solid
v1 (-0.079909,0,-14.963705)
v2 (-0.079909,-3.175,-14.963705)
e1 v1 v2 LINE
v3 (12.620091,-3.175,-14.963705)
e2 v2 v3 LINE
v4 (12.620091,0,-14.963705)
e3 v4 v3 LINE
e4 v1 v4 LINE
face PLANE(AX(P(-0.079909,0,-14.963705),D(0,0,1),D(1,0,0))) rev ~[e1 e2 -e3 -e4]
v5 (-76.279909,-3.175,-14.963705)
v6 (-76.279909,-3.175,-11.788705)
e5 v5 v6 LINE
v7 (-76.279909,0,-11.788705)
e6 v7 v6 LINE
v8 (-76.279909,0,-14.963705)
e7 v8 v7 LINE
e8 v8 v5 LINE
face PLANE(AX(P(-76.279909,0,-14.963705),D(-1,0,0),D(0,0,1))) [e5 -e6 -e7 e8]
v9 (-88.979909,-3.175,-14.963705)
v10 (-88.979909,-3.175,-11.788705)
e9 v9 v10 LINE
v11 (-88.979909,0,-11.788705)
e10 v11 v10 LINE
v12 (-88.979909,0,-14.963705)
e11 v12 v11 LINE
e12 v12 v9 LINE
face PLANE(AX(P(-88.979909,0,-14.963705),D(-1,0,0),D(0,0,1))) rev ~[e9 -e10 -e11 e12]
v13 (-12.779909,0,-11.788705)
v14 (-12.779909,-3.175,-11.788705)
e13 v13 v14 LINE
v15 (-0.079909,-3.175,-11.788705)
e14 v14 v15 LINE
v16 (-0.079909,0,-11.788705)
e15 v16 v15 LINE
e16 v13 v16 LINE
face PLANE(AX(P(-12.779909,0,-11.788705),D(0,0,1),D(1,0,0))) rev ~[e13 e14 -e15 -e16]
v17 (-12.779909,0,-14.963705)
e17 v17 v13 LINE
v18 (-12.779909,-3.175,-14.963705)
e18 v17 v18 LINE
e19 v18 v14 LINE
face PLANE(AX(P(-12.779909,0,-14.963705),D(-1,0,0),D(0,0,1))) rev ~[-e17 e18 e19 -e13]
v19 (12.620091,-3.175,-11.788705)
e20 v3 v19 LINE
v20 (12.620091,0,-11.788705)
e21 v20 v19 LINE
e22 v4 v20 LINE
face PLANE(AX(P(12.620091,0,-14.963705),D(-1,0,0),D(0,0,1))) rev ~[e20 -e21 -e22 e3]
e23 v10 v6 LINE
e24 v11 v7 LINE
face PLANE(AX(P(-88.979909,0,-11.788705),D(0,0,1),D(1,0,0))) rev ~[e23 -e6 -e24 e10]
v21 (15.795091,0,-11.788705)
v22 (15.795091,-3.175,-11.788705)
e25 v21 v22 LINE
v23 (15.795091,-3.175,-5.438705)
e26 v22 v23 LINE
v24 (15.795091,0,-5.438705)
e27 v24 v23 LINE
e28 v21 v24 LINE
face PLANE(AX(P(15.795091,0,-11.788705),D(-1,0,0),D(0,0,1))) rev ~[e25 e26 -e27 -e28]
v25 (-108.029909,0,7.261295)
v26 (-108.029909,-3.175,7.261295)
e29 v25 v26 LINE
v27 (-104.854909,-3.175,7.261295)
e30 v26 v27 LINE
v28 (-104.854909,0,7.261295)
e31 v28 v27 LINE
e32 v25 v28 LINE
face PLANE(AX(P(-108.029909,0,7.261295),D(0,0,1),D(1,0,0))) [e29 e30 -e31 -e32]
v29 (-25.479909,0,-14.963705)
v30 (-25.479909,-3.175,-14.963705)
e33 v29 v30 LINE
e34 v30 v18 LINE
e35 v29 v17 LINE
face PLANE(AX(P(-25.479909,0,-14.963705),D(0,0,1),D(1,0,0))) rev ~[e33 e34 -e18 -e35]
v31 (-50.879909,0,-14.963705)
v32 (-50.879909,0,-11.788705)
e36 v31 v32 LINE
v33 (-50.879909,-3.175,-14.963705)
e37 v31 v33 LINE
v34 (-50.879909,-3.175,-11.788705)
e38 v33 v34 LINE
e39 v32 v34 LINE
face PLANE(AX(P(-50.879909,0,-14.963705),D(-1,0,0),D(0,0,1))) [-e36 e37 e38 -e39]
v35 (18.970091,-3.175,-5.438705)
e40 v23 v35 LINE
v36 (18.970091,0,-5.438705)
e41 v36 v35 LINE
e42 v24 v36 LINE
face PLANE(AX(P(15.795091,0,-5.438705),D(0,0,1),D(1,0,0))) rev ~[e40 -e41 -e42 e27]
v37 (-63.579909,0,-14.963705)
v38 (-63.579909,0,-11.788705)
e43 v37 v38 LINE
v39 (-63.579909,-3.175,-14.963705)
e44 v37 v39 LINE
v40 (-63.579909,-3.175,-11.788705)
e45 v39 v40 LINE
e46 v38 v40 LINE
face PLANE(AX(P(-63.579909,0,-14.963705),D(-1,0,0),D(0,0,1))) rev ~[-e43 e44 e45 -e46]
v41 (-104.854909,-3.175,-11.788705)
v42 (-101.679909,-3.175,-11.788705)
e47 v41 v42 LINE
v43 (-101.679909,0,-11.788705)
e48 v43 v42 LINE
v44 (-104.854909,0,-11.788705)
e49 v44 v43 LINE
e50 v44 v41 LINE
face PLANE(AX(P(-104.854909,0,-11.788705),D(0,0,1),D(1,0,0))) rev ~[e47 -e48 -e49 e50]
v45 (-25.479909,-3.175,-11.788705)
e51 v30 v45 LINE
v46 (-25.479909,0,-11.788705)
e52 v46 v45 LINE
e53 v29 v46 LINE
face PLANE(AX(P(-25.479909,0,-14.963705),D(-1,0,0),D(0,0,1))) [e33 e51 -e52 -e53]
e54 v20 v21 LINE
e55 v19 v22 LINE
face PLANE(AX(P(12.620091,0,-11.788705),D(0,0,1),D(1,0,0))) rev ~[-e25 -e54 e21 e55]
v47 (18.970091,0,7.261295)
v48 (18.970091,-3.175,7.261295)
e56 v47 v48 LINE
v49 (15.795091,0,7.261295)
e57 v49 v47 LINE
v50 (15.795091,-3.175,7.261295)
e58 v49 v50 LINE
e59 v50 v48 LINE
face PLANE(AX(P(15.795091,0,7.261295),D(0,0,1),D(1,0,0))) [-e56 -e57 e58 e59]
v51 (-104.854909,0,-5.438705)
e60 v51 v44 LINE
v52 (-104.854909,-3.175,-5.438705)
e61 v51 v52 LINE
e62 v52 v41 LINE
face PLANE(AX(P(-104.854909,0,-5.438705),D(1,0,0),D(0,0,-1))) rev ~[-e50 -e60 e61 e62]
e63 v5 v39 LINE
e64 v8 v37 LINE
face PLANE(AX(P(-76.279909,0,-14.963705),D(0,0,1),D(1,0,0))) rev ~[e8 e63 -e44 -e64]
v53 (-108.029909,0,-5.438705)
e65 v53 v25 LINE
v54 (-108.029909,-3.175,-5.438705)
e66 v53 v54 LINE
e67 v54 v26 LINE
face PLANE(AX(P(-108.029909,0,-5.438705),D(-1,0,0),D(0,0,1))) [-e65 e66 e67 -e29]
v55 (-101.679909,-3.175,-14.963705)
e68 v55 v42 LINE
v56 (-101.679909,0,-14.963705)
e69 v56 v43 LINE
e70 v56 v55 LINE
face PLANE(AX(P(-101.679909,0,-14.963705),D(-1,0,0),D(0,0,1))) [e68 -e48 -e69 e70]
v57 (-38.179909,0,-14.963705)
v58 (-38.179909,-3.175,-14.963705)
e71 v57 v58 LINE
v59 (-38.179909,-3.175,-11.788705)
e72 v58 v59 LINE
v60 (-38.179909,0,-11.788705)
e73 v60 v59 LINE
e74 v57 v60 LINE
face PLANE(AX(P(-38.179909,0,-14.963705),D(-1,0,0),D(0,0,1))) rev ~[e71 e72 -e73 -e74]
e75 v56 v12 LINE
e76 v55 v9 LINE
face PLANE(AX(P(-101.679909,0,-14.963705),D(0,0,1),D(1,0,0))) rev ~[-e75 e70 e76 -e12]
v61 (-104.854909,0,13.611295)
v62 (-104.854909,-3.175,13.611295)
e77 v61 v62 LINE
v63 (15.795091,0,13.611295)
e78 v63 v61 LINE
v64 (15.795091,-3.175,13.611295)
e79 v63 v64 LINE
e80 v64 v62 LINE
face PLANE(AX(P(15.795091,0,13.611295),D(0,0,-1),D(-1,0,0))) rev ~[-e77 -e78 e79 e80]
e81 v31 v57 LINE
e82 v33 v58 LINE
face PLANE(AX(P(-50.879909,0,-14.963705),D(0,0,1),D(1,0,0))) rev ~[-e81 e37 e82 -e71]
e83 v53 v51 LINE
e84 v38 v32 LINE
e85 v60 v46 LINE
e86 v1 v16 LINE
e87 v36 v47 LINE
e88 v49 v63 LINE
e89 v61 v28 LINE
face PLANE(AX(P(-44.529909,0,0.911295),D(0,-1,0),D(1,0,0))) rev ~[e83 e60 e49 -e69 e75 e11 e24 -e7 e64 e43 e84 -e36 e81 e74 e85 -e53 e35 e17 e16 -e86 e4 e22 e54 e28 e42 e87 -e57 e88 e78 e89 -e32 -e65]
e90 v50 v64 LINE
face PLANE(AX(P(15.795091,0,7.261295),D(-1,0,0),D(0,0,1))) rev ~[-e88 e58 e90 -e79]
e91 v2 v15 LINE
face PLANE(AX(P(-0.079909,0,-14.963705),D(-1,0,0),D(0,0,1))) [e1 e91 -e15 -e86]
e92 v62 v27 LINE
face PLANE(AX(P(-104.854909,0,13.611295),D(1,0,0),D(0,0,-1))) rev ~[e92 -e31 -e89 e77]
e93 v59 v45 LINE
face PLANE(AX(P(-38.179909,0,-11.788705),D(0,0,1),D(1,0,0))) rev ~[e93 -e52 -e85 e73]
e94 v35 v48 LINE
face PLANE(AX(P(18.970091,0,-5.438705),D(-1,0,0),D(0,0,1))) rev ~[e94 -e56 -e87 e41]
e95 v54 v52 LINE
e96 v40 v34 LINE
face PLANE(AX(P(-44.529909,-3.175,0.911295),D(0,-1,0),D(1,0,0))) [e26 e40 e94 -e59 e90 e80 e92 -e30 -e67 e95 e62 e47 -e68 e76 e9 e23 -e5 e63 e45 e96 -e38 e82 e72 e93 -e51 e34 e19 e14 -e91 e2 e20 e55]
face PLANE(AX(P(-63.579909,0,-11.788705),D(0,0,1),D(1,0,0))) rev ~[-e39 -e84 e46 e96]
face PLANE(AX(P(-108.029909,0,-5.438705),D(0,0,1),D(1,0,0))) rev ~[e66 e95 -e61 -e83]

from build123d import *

# Parameters (mm, degrees)
F0_W     = 12.7
F0_H     = 3.175
F0_W_2   = 3.175
F0_H_2   = 12.7
F1_DEPTH = 3.175


# Not quite as in the source:
# - a feature names something its author has since deleted; it is built from what else it names


with BuildPart() as f1:
    # F0 (on Front) → F1 (new body)
    with BuildSketch(Plane.XZ):
        Polygon((15.7950905681, 13.6112950251), (-104.8549094319, 13.6112950251), (-104.8549094319, 7.2612950251), (-104.8549094319, -5.4387049749), (-104.8549094319, -11.7887049749), (-101.6799094319, -11.7887049749), (-88.9799094319, -11.7887049749), (-76.2799094319, -11.7887049749), (-63.5799094319, -11.7887049749), (-50.8799094319, -11.7887049749), (-38.1799094319, -11.7887049749), (-25.4799094319, -11.7887049749), (-12.7799094319, -11.7887049749), (-0.0799094319, -11.7887049749), (12.6200905681, -11.7887049749), (15.7950905681, -11.7887049749), (15.7950905681, -5.4387049749), (15.7950905681, 7.2612950251), align=None)
        with Locations((-44.5299094319, -13.3762049749)):
            Rectangle(F0_W, F0_H)
        with Locations((-19.1299094319, -13.3762049749)):
            Rectangle(F0_W, F0_H)
        with Locations((-95.3299094319, -13.3762049749)):
            Rectangle(F0_W, F0_H)
        with Locations((-69.9299094319, -13.3762049749)):
            Rectangle(F0_W, F0_H)
        with Locations((6.2700905681, -13.3762049749)):
            Rectangle(F0_W, F0_H)
        with Locations((-106.4424094319, 0.9112950251)):
            Rectangle(F0_W_2, F0_H_2)
        with Locations((17.3825905681, 0.9112950251)):
            Rectangle(F0_W_2, F0_H_2)
    extrude(amount=F1_DEPTH)


solid = f1.part
